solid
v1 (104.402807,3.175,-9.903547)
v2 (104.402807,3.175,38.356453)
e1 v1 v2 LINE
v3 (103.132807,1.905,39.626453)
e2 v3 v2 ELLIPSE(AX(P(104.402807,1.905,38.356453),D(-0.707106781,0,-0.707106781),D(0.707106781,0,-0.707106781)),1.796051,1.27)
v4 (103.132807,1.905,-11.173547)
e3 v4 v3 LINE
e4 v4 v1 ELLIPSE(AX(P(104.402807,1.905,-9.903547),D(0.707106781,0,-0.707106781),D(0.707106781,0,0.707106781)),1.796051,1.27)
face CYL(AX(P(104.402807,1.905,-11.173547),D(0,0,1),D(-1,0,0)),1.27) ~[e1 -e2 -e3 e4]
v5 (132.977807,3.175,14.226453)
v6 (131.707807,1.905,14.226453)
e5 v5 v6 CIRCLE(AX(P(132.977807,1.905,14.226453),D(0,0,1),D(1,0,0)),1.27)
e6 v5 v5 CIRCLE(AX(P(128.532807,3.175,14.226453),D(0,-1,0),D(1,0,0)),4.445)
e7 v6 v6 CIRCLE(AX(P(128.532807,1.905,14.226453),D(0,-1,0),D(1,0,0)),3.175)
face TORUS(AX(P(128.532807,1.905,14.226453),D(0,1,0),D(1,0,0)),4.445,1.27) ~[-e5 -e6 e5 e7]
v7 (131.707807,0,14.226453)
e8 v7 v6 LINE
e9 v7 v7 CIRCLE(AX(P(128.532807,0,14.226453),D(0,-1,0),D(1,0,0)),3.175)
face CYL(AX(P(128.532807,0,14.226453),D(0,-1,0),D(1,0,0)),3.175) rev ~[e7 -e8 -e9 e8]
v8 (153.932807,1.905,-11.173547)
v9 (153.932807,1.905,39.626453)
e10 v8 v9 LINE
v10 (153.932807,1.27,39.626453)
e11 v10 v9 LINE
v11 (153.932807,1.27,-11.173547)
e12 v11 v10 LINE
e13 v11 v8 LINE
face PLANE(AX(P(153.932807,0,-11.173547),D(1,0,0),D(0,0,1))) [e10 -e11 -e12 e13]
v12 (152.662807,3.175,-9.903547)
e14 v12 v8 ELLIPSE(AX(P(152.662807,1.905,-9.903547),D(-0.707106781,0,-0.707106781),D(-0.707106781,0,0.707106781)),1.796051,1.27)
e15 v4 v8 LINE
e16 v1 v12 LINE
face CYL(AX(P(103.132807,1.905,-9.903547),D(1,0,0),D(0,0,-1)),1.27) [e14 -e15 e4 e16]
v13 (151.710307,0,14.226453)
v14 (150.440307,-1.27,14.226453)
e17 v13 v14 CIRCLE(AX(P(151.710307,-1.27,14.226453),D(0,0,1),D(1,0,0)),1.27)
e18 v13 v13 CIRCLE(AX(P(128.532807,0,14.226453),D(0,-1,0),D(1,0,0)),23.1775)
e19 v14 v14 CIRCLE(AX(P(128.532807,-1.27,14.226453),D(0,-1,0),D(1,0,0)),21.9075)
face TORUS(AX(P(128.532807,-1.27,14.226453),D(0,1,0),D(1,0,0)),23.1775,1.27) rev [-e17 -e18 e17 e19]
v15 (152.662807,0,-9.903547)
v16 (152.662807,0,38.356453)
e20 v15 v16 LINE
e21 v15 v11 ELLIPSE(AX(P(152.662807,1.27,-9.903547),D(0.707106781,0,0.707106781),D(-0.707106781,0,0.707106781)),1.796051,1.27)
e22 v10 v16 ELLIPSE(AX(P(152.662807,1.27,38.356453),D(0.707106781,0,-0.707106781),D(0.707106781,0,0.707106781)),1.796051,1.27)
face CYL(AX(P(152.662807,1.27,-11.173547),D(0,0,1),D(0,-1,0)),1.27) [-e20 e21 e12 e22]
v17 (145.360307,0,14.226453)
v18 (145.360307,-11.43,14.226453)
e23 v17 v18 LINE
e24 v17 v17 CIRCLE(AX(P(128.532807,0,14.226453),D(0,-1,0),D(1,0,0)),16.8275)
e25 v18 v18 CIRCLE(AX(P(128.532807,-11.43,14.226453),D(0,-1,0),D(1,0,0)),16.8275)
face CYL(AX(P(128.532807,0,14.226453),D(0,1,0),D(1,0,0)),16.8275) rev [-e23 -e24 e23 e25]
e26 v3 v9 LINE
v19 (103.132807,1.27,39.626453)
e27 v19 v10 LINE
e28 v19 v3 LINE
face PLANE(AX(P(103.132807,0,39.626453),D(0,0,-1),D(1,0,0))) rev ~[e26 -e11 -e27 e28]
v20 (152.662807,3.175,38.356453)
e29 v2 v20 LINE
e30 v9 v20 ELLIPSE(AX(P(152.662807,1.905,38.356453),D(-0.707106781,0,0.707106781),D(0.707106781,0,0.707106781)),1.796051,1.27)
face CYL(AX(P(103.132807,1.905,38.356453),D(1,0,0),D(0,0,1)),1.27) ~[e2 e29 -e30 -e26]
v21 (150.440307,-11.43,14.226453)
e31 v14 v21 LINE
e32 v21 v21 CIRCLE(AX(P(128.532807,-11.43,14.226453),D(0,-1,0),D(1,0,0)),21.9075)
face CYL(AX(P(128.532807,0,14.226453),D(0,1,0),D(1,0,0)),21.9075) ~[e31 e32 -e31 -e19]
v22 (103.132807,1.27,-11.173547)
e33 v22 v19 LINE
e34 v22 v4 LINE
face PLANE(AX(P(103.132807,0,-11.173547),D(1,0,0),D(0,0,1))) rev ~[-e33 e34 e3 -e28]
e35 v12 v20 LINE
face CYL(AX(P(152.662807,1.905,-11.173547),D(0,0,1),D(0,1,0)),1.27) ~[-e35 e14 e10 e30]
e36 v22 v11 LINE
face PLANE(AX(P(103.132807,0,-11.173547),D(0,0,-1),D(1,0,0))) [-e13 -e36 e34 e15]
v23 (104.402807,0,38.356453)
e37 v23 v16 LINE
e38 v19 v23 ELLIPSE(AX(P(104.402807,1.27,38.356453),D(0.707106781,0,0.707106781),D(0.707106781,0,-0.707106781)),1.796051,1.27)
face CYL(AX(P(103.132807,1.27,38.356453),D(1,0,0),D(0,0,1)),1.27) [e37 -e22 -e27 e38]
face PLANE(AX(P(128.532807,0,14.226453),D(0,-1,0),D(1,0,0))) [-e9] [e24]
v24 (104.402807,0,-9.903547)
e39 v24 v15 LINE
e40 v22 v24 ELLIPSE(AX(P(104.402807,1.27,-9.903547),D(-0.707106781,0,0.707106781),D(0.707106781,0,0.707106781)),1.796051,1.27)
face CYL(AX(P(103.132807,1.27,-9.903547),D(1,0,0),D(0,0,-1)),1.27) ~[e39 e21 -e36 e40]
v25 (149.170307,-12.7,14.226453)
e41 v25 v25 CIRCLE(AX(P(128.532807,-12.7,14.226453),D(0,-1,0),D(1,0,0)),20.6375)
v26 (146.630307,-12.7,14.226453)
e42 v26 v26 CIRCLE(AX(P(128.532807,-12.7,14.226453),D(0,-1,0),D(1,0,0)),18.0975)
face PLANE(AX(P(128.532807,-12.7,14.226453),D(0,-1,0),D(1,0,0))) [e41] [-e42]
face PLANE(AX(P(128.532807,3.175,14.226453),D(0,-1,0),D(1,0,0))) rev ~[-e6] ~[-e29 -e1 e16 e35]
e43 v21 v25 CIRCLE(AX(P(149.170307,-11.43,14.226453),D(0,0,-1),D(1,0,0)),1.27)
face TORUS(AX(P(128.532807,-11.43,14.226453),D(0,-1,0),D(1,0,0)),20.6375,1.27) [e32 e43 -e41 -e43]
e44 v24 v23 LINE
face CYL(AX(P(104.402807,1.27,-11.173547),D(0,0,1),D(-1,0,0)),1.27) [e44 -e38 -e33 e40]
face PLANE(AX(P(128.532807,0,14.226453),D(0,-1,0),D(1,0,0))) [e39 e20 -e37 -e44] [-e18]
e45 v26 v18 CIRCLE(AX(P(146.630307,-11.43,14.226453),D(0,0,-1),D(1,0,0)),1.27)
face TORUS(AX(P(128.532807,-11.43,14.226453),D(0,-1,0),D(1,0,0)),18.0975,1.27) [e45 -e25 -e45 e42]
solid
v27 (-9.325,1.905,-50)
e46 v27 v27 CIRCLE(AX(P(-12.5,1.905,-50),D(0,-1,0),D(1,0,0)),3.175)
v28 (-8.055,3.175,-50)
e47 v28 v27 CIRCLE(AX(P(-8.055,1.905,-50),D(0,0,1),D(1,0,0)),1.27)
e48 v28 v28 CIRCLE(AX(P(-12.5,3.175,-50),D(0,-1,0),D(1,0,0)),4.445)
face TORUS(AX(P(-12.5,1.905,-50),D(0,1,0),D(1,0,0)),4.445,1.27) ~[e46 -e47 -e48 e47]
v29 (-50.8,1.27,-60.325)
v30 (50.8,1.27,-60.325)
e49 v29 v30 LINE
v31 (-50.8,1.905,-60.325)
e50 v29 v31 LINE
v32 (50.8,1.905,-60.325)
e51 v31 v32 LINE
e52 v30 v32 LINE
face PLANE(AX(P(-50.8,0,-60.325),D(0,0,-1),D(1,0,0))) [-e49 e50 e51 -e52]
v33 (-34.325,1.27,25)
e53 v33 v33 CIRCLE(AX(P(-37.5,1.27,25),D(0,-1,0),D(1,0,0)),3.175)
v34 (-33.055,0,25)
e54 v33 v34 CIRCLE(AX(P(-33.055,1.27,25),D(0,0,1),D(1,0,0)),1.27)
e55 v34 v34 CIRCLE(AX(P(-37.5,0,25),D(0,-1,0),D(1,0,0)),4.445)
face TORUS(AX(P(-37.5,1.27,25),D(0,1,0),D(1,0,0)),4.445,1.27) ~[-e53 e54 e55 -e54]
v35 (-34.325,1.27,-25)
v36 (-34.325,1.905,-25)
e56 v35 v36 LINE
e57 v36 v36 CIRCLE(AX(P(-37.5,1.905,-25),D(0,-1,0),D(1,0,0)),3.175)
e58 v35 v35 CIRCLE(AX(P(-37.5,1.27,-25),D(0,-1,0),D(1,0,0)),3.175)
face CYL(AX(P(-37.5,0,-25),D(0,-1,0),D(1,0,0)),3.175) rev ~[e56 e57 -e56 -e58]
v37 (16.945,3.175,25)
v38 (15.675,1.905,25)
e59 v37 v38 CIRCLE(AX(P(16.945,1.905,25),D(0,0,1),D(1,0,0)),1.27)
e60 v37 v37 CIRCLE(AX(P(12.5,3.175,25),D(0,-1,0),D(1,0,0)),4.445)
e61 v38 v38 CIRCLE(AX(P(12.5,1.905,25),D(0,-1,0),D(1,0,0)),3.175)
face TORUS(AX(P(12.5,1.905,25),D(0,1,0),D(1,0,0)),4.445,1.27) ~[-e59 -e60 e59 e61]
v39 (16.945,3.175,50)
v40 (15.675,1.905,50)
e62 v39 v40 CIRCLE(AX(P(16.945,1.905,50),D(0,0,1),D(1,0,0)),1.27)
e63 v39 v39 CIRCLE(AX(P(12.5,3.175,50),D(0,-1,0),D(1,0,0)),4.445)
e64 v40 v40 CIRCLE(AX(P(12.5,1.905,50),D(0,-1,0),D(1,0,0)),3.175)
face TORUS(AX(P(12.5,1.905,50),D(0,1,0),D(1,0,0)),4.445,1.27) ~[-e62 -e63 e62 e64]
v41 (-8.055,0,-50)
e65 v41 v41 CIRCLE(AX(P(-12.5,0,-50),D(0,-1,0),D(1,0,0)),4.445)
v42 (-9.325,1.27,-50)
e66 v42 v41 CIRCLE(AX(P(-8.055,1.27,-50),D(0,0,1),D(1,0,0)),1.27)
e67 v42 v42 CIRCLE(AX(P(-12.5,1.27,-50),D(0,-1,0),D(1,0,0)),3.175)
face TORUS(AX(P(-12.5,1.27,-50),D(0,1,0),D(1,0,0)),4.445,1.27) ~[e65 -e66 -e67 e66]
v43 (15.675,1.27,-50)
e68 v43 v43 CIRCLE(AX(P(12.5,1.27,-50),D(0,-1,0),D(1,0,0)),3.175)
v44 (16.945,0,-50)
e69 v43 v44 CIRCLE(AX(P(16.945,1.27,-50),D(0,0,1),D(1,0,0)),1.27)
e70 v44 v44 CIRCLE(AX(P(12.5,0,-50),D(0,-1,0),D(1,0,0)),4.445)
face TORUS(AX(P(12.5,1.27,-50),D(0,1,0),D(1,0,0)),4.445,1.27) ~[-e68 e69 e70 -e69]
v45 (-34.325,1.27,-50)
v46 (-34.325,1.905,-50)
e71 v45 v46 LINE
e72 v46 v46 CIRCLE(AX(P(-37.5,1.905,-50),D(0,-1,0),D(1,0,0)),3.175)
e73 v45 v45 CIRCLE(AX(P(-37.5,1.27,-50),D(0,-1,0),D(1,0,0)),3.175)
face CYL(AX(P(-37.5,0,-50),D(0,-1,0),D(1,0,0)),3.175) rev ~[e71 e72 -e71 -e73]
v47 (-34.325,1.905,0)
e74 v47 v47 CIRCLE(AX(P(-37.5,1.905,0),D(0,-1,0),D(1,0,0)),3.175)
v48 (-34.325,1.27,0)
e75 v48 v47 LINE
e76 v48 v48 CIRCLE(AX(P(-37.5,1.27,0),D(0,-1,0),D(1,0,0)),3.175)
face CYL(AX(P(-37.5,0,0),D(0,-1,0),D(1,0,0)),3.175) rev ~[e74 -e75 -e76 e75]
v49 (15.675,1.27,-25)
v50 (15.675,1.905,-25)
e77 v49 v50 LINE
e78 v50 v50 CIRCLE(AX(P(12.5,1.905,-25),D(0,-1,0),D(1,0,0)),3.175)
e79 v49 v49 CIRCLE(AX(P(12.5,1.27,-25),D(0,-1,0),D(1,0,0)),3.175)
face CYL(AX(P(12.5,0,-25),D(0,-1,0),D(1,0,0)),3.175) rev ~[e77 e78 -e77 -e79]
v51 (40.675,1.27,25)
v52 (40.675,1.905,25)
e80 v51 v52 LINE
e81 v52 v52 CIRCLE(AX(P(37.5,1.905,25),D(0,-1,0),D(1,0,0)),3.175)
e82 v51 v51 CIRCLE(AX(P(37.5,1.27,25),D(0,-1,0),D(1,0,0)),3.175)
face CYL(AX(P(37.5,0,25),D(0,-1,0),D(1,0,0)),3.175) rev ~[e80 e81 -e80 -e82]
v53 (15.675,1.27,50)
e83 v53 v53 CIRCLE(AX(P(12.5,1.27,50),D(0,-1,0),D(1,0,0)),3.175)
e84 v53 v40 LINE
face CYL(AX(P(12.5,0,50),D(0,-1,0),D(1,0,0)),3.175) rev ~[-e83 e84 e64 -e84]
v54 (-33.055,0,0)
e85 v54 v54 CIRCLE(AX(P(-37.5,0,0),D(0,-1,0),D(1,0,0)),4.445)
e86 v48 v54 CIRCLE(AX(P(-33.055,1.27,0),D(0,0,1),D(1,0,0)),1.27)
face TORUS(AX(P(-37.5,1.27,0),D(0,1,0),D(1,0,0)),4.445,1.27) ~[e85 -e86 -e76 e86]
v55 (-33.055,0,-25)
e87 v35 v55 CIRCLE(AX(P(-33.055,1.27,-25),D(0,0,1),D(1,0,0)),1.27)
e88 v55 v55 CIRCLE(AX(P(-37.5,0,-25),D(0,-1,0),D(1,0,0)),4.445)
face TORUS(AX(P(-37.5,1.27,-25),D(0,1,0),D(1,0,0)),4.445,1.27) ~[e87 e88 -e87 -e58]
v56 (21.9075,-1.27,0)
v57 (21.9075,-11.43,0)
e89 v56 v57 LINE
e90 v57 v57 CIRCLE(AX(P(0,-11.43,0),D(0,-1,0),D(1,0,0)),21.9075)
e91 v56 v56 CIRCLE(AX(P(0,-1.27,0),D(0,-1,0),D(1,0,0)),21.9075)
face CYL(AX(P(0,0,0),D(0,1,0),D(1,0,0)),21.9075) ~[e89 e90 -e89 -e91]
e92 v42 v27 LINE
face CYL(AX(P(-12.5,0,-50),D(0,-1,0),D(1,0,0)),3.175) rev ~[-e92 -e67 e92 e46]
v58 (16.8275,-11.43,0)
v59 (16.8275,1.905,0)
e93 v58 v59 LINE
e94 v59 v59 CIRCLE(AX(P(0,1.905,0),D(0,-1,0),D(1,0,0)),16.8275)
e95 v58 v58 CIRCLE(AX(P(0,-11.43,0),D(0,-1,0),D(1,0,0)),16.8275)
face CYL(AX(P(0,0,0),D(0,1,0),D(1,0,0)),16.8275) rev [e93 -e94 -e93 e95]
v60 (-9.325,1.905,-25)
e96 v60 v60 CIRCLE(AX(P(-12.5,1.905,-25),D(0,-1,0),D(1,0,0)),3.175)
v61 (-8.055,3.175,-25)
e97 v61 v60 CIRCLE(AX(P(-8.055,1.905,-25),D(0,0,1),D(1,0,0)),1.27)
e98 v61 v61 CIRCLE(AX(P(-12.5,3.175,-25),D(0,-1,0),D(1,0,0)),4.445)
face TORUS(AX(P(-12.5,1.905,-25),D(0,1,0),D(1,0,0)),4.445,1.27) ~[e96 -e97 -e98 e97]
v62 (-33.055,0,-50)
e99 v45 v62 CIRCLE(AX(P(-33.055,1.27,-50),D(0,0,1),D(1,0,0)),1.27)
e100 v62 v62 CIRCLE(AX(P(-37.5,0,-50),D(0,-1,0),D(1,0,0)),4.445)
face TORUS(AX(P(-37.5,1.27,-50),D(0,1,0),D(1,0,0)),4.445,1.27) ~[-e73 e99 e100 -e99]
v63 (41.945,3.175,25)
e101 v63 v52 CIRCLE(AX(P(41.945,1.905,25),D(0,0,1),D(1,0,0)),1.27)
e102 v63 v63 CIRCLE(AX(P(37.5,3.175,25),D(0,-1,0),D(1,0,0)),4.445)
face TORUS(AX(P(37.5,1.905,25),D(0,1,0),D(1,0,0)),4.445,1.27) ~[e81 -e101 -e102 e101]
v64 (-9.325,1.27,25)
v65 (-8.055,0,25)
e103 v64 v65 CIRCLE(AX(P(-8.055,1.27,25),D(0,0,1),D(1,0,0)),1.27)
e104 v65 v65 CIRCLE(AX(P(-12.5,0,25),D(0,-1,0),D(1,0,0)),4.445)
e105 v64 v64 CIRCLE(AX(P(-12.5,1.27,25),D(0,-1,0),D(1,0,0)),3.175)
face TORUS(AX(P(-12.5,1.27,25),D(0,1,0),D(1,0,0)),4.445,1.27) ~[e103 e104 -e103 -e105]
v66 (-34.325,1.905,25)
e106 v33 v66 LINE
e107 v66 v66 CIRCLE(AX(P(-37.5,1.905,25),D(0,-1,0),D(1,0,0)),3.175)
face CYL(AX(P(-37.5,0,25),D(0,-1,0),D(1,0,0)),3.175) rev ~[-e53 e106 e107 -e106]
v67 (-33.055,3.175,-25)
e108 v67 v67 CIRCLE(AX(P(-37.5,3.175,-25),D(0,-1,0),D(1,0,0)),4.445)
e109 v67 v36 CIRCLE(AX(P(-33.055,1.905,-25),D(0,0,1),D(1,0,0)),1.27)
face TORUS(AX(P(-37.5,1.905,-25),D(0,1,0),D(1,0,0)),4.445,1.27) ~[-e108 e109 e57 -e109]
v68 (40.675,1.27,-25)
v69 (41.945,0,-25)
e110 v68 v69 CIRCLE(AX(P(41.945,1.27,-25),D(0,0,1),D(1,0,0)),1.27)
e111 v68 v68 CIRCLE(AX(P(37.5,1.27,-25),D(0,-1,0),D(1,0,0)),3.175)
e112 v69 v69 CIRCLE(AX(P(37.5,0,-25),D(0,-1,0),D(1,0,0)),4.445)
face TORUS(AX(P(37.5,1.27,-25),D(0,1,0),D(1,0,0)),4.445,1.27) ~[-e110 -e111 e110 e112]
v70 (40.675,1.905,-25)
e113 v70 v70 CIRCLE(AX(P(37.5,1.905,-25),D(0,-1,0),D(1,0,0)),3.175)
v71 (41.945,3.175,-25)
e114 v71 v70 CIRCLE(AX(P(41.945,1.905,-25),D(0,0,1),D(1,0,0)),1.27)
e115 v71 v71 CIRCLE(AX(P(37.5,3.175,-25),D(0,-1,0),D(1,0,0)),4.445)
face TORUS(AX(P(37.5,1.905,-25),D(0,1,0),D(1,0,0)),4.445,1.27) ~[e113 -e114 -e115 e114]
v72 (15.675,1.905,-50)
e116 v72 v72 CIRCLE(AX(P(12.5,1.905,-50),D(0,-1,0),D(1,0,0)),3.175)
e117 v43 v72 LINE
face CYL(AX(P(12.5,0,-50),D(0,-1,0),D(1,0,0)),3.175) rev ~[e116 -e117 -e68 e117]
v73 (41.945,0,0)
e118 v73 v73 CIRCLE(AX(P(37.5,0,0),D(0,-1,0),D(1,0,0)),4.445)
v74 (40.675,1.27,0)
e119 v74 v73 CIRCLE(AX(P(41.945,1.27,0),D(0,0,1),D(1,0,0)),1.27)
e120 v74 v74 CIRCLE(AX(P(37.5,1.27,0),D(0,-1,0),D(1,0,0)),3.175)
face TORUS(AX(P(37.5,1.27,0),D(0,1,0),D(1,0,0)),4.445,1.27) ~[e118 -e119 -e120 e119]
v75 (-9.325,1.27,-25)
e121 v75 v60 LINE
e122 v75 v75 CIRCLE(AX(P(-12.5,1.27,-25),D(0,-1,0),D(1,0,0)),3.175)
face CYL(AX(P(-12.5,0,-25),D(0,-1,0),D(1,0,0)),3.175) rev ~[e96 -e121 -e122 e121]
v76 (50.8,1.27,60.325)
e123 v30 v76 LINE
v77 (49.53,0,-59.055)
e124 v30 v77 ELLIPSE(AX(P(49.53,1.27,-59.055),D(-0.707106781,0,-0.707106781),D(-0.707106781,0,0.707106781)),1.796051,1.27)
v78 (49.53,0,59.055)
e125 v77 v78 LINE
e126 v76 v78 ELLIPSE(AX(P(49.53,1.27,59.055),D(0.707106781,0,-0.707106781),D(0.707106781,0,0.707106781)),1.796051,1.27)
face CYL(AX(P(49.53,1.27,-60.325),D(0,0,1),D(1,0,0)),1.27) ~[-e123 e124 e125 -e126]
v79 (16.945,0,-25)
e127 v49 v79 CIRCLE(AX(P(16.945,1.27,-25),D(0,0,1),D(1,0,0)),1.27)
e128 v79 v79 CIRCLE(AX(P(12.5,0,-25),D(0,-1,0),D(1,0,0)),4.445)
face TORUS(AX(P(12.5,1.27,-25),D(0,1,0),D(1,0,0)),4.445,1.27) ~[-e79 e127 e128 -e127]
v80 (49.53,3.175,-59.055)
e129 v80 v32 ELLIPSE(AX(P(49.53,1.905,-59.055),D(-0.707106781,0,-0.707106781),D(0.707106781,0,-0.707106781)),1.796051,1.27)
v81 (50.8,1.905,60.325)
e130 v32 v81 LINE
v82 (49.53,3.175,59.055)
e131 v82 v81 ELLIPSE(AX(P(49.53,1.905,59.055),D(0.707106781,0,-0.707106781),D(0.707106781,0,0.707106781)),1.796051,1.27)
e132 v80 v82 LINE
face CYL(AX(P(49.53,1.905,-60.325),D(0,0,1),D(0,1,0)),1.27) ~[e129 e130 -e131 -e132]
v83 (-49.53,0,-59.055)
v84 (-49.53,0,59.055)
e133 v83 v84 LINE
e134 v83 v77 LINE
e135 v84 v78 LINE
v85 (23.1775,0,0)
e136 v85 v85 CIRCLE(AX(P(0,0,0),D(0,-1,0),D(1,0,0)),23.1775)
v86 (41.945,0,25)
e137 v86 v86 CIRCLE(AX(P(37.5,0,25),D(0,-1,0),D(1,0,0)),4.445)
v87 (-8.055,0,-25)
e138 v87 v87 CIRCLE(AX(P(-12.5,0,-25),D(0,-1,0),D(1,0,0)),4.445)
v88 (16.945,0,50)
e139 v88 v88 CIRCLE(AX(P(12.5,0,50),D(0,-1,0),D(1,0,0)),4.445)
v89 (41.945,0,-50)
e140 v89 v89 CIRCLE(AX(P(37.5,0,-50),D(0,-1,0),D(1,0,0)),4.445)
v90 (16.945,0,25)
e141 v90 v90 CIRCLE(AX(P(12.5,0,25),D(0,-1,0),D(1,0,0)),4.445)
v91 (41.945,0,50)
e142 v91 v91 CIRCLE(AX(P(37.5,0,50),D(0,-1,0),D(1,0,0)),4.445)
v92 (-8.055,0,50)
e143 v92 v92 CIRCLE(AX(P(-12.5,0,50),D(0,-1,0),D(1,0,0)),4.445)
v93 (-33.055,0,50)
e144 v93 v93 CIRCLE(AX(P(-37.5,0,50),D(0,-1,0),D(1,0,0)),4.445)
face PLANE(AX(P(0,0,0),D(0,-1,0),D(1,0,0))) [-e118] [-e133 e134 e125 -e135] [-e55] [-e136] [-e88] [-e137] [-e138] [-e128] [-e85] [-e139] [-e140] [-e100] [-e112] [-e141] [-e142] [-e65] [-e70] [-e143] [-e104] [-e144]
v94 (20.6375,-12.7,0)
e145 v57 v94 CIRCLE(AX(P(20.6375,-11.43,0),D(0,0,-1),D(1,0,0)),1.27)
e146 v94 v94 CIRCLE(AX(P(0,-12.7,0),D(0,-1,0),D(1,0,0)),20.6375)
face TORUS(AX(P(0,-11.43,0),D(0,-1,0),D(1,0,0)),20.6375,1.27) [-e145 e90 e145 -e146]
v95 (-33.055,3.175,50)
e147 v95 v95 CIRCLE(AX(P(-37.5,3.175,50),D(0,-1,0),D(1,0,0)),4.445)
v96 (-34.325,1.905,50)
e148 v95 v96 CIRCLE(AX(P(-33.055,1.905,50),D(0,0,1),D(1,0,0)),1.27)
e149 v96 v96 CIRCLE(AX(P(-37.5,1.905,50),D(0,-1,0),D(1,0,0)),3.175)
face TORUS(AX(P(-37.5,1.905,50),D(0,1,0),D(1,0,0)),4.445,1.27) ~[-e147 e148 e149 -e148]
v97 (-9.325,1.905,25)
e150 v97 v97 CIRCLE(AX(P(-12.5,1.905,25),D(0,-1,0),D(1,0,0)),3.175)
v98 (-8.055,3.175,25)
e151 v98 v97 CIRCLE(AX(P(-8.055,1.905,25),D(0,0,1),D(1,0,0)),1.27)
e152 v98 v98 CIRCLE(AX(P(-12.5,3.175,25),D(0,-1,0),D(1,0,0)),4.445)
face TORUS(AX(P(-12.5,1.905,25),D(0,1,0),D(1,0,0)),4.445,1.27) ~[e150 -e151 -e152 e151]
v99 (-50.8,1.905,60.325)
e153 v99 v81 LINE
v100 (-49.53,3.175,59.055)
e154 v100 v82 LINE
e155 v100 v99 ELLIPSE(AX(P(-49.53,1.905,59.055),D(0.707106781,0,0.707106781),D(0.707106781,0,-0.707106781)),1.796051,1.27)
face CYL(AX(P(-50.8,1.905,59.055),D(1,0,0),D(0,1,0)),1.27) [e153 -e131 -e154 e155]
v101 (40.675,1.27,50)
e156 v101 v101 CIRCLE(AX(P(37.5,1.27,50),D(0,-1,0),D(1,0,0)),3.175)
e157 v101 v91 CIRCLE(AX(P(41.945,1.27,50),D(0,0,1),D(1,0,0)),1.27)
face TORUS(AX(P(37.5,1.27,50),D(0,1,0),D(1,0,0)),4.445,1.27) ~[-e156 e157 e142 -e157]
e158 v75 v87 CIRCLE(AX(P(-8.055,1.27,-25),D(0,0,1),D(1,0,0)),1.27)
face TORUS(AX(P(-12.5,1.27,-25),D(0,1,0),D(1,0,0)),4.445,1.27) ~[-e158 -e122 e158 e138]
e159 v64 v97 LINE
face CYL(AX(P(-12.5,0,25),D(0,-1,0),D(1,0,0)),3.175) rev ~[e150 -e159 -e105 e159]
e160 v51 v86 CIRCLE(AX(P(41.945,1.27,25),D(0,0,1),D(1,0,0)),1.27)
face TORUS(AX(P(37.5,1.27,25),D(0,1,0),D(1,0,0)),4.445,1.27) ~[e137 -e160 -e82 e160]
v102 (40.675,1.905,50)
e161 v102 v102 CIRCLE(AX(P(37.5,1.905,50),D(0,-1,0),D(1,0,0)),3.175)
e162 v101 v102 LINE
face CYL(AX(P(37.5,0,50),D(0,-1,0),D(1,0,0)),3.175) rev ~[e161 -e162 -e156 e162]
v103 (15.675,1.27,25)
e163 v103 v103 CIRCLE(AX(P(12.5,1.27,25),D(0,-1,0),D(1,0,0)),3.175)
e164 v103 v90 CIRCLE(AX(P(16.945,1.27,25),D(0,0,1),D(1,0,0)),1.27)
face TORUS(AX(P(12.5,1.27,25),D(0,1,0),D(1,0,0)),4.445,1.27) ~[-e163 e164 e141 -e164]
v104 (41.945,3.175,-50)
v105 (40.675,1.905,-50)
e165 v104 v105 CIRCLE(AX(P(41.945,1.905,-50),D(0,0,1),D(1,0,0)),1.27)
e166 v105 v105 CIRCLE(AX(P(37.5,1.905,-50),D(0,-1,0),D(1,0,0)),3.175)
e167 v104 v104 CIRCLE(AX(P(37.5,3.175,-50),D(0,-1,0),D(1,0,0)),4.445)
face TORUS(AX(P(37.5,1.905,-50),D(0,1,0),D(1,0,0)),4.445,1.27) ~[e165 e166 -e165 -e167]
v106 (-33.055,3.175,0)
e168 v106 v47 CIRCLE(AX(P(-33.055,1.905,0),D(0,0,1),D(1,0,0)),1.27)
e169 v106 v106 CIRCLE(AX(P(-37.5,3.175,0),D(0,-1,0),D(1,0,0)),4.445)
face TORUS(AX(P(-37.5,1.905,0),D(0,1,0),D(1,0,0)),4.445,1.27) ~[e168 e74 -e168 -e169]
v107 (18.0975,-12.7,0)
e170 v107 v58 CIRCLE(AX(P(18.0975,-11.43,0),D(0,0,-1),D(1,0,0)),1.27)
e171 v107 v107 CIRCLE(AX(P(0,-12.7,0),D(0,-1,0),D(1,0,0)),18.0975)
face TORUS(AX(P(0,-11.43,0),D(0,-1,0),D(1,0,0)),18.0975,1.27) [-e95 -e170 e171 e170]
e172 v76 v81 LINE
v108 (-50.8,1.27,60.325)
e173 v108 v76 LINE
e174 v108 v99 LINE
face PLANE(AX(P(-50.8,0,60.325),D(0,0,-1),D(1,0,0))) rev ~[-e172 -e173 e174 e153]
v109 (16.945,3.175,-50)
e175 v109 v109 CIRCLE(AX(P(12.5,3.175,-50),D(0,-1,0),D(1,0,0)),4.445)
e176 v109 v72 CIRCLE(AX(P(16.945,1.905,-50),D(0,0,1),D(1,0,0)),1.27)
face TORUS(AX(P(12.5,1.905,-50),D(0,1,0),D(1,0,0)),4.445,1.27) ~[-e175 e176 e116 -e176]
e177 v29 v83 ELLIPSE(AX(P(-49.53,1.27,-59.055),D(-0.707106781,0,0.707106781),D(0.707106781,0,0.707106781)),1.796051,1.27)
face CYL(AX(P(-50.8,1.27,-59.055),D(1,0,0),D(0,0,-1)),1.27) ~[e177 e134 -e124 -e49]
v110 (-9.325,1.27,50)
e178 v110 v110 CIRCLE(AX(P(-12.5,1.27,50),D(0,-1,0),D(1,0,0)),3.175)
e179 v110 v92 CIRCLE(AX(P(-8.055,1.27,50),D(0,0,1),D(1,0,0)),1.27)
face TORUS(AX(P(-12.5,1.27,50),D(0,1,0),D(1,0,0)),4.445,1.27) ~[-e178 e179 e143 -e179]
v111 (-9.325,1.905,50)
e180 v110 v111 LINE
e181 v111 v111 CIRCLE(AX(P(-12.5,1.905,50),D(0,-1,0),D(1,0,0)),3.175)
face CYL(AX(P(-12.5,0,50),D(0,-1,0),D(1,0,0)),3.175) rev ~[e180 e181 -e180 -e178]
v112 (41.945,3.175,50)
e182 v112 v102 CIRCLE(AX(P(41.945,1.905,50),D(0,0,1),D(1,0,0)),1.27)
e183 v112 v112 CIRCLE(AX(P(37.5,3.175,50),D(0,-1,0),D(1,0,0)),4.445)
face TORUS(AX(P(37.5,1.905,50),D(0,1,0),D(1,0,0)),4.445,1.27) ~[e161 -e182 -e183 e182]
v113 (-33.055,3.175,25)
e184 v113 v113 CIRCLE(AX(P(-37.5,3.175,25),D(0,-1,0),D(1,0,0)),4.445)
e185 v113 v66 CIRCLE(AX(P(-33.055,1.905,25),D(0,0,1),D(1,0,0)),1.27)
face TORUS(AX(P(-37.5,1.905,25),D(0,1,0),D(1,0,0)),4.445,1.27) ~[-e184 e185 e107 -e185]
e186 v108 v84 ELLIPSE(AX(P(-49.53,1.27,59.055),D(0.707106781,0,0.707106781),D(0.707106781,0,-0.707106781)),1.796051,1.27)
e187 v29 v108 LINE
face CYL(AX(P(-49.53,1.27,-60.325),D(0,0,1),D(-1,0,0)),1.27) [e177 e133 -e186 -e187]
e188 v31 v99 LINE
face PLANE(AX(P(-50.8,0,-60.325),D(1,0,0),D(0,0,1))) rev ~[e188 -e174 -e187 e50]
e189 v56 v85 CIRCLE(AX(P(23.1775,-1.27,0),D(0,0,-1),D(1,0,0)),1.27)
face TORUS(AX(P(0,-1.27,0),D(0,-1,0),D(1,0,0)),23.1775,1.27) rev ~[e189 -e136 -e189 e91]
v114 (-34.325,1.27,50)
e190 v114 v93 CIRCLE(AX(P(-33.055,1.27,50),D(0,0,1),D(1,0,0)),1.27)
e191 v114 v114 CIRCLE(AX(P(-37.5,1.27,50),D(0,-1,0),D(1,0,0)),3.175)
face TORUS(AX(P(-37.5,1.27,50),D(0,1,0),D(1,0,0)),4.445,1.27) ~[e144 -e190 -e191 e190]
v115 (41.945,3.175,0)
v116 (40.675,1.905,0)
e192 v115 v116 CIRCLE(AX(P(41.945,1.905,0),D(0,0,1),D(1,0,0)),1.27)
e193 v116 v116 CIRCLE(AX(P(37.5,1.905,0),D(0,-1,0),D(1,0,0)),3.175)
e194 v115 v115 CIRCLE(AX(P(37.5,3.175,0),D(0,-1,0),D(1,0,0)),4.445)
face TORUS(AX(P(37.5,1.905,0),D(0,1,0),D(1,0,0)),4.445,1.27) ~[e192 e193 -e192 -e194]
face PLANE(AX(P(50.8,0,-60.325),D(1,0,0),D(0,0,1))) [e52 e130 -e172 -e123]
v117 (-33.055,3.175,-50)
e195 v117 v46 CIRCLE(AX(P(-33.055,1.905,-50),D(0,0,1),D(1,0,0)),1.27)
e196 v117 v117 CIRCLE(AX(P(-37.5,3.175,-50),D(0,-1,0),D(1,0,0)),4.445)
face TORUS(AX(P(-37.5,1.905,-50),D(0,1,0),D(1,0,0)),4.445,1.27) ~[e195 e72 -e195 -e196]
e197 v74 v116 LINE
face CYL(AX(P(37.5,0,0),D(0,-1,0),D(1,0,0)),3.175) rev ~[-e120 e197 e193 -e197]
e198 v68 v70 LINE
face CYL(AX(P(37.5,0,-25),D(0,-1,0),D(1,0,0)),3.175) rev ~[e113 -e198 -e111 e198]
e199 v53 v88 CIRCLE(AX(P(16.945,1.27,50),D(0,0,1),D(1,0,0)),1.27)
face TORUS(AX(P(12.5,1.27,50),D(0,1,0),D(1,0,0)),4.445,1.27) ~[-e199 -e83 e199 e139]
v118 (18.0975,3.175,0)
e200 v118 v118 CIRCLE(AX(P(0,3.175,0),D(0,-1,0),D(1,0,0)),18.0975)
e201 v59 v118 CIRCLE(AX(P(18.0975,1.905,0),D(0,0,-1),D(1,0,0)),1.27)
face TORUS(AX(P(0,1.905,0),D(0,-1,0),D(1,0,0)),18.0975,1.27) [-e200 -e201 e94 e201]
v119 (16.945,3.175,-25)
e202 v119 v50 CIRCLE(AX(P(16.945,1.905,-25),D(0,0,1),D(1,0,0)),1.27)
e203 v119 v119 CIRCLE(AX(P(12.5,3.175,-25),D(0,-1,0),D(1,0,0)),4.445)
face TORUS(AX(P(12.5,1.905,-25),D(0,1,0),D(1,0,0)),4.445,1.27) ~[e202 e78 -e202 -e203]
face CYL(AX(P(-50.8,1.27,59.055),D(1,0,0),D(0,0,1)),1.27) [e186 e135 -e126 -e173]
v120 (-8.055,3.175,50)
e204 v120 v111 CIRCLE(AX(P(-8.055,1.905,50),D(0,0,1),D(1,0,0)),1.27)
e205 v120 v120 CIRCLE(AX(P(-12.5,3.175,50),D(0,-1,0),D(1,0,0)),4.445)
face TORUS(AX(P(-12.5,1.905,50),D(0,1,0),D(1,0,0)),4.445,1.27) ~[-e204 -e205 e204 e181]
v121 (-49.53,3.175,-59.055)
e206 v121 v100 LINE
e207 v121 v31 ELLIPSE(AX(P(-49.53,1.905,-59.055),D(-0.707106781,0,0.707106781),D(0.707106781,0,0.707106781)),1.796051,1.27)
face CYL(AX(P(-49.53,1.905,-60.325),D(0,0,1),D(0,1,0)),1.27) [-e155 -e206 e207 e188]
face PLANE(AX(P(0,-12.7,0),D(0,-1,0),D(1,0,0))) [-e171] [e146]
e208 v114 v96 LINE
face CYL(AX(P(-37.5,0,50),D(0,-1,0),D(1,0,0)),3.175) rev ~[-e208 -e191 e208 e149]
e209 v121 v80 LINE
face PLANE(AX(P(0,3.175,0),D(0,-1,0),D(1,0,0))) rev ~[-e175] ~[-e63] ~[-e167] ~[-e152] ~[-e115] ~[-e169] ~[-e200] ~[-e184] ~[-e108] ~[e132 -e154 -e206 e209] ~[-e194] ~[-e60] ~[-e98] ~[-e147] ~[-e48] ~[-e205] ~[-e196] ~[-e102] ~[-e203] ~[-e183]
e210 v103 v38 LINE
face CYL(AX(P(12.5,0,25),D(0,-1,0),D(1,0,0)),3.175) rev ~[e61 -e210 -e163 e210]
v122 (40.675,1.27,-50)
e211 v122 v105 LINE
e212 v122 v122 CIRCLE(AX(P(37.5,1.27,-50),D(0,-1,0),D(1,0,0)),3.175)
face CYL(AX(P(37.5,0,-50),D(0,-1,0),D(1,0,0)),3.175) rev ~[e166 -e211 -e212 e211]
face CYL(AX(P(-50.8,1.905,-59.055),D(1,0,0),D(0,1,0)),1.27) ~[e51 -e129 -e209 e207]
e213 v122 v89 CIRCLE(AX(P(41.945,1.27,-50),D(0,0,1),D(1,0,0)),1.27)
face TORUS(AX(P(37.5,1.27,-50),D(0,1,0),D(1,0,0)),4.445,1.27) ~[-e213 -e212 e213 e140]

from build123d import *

# Parameters (mm, degrees)
F0_W     = 101.6
F0_H     = 120.65
F0_R     = 3.175
F0_R_2   = 21.9075
F0_R_3   = 16.8275
F1_DEPTH = 3.175
F2_DEPTH = 12.7
F3_R     = 1.27
F4_W     = 50.8
F4_H     = 50.8
F4_R     = 21.9075
F4_R_2   = 16.8275
F4_R_3   = 3.175
F5_DEPTH = 3.175
F6_DEPTH = 12.7
F7_R     = 1.27


with BuildPart() as f1:
    # F0 (on Front) → F1 (new body)
    with BuildSketch(Plane.XZ):
        Rectangle(F0_W, F0_H)
        with Locations((-37.5, -50)):
            Circle(F0_R, mode=Mode.SUBTRACT)
        with Locations((-12.5, -50)):
            Circle(F0_R, mode=Mode.SUBTRACT)
        with Locations((-37.5, -25)):
            Circle(F0_R, mode=Mode.SUBTRACT)
        with Locations((-12.5, -25)):
            Circle(F0_R, mode=Mode.SUBTRACT)
        with Locations((12.5, -50)):
            Circle(F0_R, mode=Mode.SUBTRACT)
        with Locations((37.5, -50)):
            Circle(F0_R, mode=Mode.SUBTRACT)
        with Locations((12.5, -25)):
            Circle(F0_R, mode=Mode.SUBTRACT)
        with Locations((37.5, -25)):
            Circle(F0_R, mode=Mode.SUBTRACT)
        with Locations((-37.5, 0)):
            Circle(F0_R, mode=Mode.SUBTRACT)
        with Locations((-37.5, 25)):
            Circle(F0_R, mode=Mode.SUBTRACT)
        Circle(F0_R_2, mode=Mode.SUBTRACT)
        with Locations((-12.5, 25)):
            Circle(F0_R, mode=Mode.SUBTRACT)
        with Locations((-37.5, 50)):
            Circle(F0_R, mode=Mode.SUBTRACT)
        with Locations((-12.5, 50)):
            Circle(F0_R, mode=Mode.SUBTRACT)
        with Locations((12.5, 25)):
            Circle(F0_R, mode=Mode.SUBTRACT)
        with Locations((37.5, 0)):
            Circle(F0_R, mode=Mode.SUBTRACT)
        with Locations((37.5, 25)):
            Circle(F0_R, mode=Mode.SUBTRACT)
        with Locations((12.5, 50)):
            Circle(F0_R, mode=Mode.SUBTRACT)
        with Locations((37.5, 50)):
            Circle(F0_R, mode=Mode.SUBTRACT)
        Circle(F0_R_2)
        Circle(F0_R_3, mode=Mode.SUBTRACT)
    extrude(amount=-F1_DEPTH)

    # F0 (on Front) → F2 (join)
    with BuildSketch(Plane.XZ):
        Circle(F0_R_2)
        Circle(F0_R_3, mode=Mode.SUBTRACT)
    extrude(amount=F2_DEPTH)

    # F3
    f3_edges = [f1.edges().sort_by_distance(p)[0] for p in [
        (-16.8275, -12.7, 0),
        (-21.9075, -12.7, 0),
        (-21.9075, 0, 0),
        (0, 0, 60.325),
        (50.8, 0, 0),
        (-50.8, 0, 0),
        (0, 0, -60.325),
        (-40.675, 0, -50),
        (-15.675, 0, -50),
        (-40.675, 0, -25),
        (-15.675, 0, -25),
        (9.325, 0, -50),
        (34.325, 0, -50),
        (9.325, 0, -25),
        (34.325, 0, -25),
        (-40.675, 0, 0),
        (-40.675, 0, 25),
        (-15.675, 0, 25),
        (-40.675, 0, 50),
        (-15.675, 0, 50),
        (9.325, 0, 25),
        (34.325, 0, 0),
        (34.325, 0, 25),
        (9.325, 0, 50),
        (34.325, 0, 50),
        (0, 3.175, 60.325),
        (-50.8, 3.175, 0),
        (0, 3.175, -60.325),
        (50.8, 3.175, 0),
        (-40.675, 3.175, -50),
        (-15.675, 3.175, -50),
        (-40.675, 3.175, -25),
        (-15.675, 3.175, -25),
        (9.325, 3.175, -50),
        (34.325, 3.175, -50),
        (9.325, 3.175, -25),
        (34.325, 3.175, -25),
        (-40.675, 3.175, 0),
        (-40.675, 3.175, 25),
        (-15.675, 3.175, 25),
        (-40.675, 3.175, 50),
        (-15.675, 3.175, 50),
        (9.325, 3.175, 25),
        (34.325, 3.175, 0),
        (34.325, 3.175, 25),
        (9.325, 3.175, 50),
        (34.325, 3.175, 50),
        (-16.8275, 3.175, 0),
    ]]
    fillet(f3_edges, radius=F3_R)


with BuildPart() as f5:
    # F4 (on Front) → F5 (new body, through all)
    with BuildSketch(Plane.XZ):
        with Locations((128.5328067183, 14.2264530718)):
            Rectangle(F4_W, F4_H)
        with Locations((128.5328067183, 14.2264530718)):
            Circle(F4_R, mode=Mode.SUBTRACT)
        with Locations((128.5328067183, 14.2264530718)):
            Circle(F4_R)
        with Locations((128.5328067183, 14.2264530718)):
            Circle(F4_R_2, mode=Mode.SUBTRACT)
        with Locations((128.5328067183, 14.2264530718)):
            Circle(F4_R_2)
        with Locations((128.5328067183, 14.2264530718)):
            Circle(F4_R_3, mode=Mode.SUBTRACT)
    extrude(amount=-F5_DEPTH)

    # F4 (on Front) → F6 (join, through all)
    with BuildSketch(Plane.XZ):
        with Locations((128.5328067183, 14.2264530718)):
            Circle(F4_R)
        with Locations((128.5328067183, 14.2264530718)):
            Circle(F4_R_2, mode=Mode.SUBTRACT)
    extrude(amount=F6_DEPTH)

    # F7
    f7_edges = [f5.edges().sort_by_distance(p)[0] for p in [
        (128.532807, 0, 39.626453),
        (153.932807, 0, 14.226453),
        (103.132807, 0, 14.226453),
        (128.532807, 0, -11.173547),
        (106.625307, 0, 14.226453),
        (128.532807, 3.175, 39.626453),
        (153.932807, 3.175, 14.226453),
        (103.132807, 3.175, 14.226453),
        (128.532807, 3.175, -11.173547),
        (125.357807, 3.175, 14.226453),
        (106.625307, -12.7, 14.226453),
        (111.705307, -12.7, 14.226453),
    ]]
    fillet(f7_edges, radius=F7_R)


solid = Compound([f1.part, f5.part])
